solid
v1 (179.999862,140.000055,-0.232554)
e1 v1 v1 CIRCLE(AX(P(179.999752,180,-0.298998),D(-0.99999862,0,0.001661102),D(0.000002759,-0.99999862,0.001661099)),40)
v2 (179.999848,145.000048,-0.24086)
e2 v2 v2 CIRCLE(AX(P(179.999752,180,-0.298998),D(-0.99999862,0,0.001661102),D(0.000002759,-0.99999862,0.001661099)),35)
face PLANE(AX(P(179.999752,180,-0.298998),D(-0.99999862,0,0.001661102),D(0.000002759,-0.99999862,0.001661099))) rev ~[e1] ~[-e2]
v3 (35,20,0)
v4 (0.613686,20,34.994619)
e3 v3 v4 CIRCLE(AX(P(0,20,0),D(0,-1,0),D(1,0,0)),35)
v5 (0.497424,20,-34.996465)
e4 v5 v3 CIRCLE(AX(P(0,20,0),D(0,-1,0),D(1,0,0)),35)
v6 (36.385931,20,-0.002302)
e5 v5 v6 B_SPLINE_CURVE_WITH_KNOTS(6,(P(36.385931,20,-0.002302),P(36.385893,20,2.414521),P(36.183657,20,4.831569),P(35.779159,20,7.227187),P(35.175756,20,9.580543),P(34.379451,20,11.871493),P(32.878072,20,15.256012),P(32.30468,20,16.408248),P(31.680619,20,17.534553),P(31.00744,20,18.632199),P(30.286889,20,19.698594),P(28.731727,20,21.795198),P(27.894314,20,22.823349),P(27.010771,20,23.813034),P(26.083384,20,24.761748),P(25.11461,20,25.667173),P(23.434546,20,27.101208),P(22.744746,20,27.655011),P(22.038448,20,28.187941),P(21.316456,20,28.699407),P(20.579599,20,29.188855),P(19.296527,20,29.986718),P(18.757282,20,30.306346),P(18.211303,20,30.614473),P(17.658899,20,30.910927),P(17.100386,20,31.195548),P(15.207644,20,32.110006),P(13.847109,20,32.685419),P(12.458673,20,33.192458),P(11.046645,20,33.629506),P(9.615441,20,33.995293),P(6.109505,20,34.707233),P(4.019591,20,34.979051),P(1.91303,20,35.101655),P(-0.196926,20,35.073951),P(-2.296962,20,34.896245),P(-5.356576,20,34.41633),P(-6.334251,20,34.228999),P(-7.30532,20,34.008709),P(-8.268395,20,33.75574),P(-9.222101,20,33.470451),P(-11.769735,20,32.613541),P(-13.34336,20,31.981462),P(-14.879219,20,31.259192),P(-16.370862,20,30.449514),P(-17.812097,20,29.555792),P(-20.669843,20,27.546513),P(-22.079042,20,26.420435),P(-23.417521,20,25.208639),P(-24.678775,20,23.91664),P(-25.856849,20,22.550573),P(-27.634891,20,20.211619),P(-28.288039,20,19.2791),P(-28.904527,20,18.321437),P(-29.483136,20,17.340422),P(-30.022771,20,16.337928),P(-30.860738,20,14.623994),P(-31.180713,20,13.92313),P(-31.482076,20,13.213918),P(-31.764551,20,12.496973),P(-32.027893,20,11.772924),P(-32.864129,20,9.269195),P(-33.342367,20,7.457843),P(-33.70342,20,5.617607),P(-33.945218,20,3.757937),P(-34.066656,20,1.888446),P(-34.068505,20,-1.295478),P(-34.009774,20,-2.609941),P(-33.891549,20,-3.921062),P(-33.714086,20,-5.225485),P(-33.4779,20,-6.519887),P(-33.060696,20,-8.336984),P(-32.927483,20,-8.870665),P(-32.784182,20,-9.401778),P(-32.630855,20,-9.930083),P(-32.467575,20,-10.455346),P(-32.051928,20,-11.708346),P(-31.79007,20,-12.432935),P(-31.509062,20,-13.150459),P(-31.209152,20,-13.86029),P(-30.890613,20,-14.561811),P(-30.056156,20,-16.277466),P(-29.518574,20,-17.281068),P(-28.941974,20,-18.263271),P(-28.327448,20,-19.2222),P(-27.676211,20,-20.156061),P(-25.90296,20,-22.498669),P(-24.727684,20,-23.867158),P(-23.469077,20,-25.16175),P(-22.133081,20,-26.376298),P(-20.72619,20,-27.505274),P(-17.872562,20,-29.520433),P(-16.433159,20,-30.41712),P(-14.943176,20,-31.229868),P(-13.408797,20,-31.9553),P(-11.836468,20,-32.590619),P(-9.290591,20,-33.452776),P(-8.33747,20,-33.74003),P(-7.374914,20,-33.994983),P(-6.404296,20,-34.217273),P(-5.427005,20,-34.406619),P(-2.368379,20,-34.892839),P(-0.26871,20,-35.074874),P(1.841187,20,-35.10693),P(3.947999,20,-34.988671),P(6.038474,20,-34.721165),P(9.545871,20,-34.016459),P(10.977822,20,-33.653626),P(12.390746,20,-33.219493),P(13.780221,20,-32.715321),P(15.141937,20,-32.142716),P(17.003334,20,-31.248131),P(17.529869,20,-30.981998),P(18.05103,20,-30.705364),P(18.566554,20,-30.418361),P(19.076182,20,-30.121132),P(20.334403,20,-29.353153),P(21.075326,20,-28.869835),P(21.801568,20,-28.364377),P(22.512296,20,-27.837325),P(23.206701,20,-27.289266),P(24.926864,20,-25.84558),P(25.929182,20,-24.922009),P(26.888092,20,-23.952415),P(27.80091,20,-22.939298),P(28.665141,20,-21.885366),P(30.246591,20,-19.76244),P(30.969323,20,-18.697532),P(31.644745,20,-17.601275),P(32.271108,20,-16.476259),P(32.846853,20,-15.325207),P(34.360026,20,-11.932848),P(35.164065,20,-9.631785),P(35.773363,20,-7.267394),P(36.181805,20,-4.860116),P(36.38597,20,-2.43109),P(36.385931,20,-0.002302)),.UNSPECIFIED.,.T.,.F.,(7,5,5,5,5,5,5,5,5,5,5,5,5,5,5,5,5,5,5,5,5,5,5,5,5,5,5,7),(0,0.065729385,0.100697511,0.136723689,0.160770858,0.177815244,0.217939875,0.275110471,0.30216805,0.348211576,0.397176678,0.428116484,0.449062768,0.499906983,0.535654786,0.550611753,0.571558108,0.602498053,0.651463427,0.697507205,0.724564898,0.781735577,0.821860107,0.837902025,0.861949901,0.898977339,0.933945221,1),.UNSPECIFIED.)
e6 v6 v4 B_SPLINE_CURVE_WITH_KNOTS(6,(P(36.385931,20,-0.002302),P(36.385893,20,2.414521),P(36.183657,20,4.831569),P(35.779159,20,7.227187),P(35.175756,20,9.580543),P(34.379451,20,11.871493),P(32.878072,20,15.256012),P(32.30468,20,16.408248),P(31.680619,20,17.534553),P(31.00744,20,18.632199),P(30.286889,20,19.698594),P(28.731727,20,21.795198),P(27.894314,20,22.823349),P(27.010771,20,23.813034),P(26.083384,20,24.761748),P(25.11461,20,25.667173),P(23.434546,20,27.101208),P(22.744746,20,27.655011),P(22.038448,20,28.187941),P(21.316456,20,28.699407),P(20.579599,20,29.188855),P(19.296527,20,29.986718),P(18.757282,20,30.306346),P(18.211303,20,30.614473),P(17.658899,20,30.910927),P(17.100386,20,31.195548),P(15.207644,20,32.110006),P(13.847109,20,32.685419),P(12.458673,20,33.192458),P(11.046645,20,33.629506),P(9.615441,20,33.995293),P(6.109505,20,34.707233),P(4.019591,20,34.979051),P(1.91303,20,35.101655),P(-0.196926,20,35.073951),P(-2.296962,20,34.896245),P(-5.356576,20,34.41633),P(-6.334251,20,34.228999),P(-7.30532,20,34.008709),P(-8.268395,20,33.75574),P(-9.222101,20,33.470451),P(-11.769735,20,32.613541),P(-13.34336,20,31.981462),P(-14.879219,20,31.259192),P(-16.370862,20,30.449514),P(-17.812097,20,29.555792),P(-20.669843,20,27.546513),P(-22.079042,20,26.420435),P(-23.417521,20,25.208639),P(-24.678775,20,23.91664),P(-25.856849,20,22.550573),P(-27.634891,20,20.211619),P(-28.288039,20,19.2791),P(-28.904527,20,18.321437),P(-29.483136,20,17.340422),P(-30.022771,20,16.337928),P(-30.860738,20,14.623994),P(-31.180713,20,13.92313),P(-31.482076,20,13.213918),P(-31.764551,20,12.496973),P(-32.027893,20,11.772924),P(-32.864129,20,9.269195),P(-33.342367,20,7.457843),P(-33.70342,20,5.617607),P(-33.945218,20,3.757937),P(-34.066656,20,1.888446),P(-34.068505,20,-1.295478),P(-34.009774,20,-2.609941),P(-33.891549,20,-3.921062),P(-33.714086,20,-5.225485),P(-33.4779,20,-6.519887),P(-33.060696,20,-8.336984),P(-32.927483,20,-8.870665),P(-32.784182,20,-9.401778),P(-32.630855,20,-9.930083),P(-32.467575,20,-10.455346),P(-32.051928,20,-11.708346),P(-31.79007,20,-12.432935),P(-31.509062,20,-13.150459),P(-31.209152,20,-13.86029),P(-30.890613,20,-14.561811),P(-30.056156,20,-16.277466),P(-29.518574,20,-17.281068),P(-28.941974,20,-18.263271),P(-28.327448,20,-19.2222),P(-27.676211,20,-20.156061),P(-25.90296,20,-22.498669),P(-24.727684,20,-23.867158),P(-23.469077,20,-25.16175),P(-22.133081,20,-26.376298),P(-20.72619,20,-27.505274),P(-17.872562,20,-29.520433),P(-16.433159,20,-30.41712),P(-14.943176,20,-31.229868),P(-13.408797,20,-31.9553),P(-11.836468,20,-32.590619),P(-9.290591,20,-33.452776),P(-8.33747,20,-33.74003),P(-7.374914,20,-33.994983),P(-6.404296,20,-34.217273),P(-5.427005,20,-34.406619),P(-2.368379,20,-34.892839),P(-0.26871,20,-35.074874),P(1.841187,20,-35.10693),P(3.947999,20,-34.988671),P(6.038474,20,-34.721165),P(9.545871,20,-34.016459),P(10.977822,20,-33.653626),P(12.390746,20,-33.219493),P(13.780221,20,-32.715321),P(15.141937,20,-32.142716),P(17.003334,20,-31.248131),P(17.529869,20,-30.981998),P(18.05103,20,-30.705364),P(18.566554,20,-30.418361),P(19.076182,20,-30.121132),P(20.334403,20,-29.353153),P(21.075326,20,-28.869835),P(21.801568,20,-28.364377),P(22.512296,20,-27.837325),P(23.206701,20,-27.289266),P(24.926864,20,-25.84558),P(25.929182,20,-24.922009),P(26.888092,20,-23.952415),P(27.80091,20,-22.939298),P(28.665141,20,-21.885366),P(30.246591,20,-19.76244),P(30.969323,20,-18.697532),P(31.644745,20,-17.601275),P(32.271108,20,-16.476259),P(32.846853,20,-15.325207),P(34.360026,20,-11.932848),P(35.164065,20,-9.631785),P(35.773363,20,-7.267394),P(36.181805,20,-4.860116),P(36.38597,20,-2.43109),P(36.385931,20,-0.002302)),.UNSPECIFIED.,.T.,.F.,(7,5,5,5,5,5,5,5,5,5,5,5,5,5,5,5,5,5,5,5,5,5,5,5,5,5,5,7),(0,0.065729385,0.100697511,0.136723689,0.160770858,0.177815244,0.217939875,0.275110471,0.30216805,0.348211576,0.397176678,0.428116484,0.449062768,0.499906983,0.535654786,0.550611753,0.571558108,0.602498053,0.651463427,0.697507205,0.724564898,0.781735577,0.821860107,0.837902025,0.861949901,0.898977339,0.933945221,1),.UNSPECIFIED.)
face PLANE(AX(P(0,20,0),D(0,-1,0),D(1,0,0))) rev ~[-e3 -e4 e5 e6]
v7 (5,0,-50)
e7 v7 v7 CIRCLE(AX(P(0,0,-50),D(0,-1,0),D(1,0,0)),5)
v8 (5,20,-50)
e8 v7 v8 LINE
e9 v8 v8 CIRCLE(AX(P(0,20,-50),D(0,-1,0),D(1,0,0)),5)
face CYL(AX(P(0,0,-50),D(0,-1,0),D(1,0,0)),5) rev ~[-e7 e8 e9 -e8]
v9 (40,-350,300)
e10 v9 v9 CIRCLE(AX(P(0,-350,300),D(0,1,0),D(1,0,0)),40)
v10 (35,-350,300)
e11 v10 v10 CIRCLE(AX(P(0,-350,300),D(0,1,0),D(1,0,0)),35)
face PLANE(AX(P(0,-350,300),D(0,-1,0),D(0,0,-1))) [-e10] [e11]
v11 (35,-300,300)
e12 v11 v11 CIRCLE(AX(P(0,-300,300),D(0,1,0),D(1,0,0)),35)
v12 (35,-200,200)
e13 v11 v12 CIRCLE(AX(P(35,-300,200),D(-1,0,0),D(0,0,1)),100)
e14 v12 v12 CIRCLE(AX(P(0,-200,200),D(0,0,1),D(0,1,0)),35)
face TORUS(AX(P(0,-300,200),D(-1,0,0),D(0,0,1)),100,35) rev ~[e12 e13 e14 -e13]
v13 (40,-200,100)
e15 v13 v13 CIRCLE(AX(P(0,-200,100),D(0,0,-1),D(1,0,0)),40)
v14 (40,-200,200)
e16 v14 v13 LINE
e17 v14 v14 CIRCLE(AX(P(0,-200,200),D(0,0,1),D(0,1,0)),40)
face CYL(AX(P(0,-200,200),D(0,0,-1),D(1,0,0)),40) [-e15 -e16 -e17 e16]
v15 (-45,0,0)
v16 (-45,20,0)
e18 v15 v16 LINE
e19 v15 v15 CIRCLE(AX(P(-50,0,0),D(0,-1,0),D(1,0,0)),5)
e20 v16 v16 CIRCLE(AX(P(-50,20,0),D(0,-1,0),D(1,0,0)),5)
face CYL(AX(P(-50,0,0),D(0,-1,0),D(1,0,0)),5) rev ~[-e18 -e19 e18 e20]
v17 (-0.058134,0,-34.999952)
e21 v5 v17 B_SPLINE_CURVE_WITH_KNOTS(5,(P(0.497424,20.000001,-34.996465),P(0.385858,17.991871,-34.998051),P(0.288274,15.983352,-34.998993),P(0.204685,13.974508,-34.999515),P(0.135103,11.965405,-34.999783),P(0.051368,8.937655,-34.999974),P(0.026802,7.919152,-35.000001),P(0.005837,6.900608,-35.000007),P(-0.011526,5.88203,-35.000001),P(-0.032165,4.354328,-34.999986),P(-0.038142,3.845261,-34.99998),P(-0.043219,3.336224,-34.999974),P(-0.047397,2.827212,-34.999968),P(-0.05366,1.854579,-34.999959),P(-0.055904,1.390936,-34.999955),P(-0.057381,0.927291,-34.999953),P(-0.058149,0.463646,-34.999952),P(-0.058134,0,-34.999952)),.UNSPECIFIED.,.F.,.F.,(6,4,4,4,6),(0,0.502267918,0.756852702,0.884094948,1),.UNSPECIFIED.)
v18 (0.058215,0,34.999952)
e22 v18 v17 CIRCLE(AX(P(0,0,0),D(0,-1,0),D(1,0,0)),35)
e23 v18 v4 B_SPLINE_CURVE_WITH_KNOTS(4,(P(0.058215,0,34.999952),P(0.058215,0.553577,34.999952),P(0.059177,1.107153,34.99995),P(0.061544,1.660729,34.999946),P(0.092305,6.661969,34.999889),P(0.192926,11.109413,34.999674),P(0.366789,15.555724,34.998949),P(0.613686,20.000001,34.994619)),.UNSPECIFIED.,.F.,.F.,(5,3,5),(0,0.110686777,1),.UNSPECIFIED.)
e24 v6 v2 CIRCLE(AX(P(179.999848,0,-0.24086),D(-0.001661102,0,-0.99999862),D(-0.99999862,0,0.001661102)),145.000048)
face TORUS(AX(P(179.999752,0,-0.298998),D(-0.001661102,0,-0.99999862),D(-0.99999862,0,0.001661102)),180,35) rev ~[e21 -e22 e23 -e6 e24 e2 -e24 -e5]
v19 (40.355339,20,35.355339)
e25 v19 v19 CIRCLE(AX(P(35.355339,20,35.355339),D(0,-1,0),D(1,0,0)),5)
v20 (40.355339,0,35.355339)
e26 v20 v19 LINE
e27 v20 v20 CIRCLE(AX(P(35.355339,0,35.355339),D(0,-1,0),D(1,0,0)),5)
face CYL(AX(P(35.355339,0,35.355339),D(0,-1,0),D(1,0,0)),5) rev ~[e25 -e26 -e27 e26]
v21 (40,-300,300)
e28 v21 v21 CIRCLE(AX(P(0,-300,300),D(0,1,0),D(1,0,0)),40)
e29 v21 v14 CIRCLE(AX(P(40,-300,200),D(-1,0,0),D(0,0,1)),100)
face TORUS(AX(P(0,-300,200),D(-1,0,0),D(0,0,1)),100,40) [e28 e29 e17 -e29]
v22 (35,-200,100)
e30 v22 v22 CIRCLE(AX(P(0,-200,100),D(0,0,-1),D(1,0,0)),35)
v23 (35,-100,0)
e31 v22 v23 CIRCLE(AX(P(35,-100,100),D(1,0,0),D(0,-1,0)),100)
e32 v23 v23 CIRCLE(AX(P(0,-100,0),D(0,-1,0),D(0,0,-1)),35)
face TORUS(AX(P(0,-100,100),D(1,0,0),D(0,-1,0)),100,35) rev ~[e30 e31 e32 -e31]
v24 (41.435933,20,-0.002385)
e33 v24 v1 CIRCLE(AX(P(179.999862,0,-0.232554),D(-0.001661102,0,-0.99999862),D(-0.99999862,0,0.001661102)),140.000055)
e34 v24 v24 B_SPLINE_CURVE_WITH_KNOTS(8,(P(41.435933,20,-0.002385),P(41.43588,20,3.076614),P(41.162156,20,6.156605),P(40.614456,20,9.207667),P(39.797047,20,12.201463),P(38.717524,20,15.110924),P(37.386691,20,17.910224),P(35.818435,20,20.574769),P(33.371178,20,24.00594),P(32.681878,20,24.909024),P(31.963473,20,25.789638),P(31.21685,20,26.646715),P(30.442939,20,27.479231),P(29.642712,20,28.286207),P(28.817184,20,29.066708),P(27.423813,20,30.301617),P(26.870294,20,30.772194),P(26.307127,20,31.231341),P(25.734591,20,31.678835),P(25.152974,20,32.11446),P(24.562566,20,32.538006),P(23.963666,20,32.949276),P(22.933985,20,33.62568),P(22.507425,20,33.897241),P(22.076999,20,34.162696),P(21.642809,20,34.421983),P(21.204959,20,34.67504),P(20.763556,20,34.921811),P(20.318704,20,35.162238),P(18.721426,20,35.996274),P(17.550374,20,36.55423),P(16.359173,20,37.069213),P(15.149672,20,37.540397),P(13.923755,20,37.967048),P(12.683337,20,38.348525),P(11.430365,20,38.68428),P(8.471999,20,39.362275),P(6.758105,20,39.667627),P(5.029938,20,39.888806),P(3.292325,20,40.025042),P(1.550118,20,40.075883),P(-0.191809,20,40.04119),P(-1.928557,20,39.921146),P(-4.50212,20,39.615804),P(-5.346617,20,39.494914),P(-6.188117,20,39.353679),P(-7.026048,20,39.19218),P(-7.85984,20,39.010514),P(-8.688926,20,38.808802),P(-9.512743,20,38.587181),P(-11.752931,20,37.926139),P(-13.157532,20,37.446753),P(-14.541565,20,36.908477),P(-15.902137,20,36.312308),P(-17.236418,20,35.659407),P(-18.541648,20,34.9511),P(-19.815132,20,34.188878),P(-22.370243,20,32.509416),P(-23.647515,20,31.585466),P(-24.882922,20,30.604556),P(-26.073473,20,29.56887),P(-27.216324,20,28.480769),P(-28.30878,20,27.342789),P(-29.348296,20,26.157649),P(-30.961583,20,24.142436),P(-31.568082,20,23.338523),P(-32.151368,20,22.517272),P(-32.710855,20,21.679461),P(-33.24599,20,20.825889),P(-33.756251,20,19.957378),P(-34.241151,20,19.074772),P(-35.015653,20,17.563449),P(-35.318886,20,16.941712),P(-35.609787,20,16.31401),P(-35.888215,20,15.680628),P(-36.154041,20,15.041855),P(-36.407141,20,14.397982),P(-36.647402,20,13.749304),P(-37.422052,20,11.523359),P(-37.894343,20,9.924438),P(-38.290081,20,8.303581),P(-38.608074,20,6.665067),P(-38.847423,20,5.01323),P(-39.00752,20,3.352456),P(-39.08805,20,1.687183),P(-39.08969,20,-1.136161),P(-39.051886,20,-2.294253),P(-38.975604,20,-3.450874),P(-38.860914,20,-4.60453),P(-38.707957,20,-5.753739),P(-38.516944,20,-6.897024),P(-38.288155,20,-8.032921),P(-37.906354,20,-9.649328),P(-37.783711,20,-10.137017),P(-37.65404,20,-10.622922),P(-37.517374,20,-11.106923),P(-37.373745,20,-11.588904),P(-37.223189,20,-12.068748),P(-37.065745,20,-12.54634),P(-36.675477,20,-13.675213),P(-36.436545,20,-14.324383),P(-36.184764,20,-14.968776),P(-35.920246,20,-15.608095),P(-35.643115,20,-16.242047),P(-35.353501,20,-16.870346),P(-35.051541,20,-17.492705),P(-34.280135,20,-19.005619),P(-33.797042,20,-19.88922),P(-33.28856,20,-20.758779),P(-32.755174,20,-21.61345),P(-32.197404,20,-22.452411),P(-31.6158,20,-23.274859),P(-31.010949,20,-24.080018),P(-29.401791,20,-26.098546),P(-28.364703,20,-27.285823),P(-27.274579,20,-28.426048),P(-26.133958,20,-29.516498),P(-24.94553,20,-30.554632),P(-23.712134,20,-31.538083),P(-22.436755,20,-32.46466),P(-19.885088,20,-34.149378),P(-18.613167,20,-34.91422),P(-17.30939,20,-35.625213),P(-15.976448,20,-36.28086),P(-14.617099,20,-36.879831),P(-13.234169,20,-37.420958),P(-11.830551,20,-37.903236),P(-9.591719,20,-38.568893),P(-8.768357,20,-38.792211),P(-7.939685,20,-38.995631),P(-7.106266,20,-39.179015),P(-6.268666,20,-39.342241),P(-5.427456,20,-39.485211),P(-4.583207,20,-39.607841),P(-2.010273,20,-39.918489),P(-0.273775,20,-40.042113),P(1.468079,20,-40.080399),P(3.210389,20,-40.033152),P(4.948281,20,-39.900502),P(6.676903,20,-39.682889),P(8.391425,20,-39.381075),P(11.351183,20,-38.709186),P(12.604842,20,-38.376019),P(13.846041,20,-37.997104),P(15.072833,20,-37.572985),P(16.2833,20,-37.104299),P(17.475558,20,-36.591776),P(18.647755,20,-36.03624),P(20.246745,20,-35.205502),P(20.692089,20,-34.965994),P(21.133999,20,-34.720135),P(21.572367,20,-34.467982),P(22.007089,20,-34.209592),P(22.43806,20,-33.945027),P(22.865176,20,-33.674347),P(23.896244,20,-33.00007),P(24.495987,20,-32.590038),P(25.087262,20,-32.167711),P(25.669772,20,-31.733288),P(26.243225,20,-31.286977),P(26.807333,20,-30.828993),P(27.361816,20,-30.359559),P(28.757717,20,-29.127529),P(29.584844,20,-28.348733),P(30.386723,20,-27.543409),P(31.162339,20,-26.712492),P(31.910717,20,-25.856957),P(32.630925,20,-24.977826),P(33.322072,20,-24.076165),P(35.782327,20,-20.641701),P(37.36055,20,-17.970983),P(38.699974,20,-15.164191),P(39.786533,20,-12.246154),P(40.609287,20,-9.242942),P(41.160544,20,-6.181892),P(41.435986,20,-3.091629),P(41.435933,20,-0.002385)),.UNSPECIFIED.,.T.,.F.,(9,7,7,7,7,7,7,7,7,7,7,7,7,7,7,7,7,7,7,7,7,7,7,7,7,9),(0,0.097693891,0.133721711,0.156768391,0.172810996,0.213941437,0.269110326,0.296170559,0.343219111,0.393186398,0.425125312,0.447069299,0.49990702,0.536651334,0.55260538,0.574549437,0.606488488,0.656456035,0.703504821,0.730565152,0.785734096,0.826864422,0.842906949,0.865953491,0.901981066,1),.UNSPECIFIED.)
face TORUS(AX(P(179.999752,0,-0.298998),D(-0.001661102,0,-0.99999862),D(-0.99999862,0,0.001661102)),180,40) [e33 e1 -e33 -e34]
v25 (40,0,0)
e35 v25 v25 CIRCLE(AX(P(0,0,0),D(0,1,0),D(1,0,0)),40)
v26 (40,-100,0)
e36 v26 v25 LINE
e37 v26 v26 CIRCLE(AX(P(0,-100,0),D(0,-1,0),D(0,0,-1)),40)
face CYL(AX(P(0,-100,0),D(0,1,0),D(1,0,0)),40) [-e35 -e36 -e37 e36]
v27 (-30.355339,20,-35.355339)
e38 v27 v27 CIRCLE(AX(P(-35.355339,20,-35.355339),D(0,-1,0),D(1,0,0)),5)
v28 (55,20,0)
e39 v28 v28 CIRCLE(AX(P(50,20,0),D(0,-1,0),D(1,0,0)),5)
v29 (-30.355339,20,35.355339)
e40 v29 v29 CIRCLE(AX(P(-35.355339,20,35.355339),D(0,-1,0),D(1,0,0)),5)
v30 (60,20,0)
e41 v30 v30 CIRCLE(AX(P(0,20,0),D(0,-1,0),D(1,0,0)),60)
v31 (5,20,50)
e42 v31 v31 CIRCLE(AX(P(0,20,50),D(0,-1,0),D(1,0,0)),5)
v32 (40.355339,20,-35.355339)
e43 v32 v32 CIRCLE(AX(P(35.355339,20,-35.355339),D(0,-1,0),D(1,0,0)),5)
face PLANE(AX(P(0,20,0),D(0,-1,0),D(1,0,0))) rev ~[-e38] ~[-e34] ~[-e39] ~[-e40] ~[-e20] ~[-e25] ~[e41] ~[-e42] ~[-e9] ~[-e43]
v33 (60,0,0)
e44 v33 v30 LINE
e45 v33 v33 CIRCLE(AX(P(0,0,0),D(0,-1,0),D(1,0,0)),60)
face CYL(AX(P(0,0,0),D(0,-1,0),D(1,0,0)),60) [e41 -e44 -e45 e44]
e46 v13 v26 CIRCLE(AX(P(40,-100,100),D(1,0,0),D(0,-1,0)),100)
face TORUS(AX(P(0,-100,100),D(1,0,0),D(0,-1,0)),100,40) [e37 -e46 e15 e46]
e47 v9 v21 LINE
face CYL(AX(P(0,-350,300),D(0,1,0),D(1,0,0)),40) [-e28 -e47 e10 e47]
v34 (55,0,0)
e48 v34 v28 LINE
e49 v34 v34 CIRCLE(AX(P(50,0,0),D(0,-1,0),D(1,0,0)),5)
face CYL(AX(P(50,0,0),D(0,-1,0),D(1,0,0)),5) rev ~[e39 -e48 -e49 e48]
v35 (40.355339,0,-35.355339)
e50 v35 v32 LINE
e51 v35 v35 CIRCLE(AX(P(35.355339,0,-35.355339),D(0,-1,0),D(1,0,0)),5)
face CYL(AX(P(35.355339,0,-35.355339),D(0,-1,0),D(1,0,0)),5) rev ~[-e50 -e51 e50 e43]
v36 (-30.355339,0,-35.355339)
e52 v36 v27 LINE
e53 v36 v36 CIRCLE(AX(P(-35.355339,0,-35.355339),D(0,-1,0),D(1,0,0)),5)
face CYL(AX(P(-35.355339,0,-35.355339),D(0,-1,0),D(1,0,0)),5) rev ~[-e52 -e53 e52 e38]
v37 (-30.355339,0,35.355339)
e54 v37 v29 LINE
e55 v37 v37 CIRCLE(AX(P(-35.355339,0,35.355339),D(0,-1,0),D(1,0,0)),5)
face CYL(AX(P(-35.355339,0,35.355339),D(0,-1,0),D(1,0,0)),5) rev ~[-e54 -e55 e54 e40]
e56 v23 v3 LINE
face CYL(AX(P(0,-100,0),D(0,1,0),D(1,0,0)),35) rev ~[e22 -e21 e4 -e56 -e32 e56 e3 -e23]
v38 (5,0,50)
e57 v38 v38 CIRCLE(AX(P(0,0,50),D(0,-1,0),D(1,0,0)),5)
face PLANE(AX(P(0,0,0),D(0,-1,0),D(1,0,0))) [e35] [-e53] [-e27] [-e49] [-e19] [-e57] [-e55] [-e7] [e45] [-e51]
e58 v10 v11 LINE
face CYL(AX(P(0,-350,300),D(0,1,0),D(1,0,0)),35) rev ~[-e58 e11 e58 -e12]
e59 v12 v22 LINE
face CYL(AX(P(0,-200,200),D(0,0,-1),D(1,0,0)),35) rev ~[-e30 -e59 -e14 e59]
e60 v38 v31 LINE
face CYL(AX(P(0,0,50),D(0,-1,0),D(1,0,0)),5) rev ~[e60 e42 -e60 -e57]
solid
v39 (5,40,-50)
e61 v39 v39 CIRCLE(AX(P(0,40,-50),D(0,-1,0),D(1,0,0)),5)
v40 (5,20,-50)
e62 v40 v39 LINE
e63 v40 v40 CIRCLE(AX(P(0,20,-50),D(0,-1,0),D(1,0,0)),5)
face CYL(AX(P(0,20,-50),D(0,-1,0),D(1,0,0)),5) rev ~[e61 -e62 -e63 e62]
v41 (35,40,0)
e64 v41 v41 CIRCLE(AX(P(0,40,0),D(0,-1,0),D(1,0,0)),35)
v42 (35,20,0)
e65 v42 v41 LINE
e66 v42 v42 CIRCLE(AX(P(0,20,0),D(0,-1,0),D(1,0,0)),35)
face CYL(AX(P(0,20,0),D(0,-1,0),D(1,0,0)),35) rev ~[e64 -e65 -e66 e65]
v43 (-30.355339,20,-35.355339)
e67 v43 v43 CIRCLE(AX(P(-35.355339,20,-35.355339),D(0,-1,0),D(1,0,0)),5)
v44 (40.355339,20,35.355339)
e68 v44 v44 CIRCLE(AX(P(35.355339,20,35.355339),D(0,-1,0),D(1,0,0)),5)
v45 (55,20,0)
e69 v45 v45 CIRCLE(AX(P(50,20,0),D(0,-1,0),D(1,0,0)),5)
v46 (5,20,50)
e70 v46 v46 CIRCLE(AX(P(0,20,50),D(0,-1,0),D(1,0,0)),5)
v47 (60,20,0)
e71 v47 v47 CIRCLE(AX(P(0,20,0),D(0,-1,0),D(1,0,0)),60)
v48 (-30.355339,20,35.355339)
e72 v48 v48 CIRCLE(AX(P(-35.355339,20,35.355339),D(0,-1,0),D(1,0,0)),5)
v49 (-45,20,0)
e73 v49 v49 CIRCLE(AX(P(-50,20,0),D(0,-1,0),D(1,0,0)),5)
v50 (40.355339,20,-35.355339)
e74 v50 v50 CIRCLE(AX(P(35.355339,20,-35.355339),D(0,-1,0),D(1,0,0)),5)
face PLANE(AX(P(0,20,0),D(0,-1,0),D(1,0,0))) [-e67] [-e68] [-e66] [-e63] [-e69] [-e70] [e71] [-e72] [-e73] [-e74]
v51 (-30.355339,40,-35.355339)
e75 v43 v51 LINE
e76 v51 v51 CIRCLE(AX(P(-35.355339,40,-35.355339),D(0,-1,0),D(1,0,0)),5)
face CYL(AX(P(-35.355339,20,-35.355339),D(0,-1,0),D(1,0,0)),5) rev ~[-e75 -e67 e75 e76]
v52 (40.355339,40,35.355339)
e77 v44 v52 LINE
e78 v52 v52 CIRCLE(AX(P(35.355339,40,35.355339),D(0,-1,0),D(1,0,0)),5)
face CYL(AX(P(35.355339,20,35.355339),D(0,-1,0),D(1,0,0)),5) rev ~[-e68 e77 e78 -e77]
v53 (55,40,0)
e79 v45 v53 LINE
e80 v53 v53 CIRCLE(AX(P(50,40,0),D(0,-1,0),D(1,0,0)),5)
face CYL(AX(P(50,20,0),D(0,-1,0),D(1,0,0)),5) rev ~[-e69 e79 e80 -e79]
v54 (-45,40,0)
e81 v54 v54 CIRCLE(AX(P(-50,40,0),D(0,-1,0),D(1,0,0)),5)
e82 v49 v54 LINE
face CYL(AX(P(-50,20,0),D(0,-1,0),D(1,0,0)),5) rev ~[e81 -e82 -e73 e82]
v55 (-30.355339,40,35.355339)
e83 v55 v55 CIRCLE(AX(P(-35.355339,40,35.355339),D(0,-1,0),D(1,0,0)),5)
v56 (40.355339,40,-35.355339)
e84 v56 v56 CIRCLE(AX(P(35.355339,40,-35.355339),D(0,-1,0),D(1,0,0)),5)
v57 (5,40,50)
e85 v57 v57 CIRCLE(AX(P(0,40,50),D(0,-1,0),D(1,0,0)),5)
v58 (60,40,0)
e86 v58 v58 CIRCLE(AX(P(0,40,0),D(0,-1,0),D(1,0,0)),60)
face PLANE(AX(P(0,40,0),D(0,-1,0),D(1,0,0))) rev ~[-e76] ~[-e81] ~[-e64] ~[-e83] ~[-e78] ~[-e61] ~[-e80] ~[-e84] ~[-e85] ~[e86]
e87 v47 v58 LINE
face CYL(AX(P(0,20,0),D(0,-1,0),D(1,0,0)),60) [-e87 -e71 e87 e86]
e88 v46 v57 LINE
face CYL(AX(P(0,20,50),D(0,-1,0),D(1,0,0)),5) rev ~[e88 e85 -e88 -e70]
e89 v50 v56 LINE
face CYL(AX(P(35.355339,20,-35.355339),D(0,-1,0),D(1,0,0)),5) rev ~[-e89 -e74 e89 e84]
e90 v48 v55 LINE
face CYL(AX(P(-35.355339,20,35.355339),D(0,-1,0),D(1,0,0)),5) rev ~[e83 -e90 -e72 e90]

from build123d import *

# Parameters (mm, degrees)
F0_R     = 60
F0_R_2   = 5
F0_R_3   = 35
F1_DEPTH = 20
F2_R     = 40
F2_R_2   = 35
F5_DEPTH = 20
F6_R     = 40
F6_R_2   = 35
F7_ANGLE = 90


with BuildPart() as f1:
    # F0 (on Front) → F1 (new body)
    with BuildSketch(Plane.XZ):
        Circle(F0_R)
        with Locations((-35.3553390593, -35.3553390593)):
            Circle(F0_R_2, mode=Mode.SUBTRACT)
        with Locations((0, -50)):
            Circle(F0_R_2, mode=Mode.SUBTRACT)
        with Locations((35.3553390593, -35.3553390593)):
            Circle(F0_R_2, mode=Mode.SUBTRACT)
        with Locations((-50, 0)):
            Circle(F0_R_2, mode=Mode.SUBTRACT)
        with Locations((-35.3553390593, 35.3553390593)):
            Circle(F0_R_2, mode=Mode.SUBTRACT)
        Circle(F0_R_3, mode=Mode.SUBTRACT)
        with Locations((50, 0)):
            Circle(F0_R_2, mode=Mode.SUBTRACT)
        with Locations((0, 50)):
            Circle(F0_R_2, mode=Mode.SUBTRACT)
        with Locations((35.3553390593, 35.3553390593)):
            Circle(F0_R_2, mode=Mode.SUBTRACT)
    extrude(amount=-F1_DEPTH)

    # F4: sweep along a path in F3
    with BuildLine(Plane.YZ) as f4_path:
        Line((-350, 300), (-300, 300))
        ThreePointArc((-300, 300), (-229.2893218813, 270.7106781187), (-200, 200))
        Line((-200, 200), (-200, 100))
        ThreePointArc((-200, 100), (-170.7106781187, 29.2893218813), (-100, 0))
        Line((-100, 0), (0, 0))
    # F2 (on Front) → F4 (sweep)
    with BuildSketch(Plane.XZ):
        Circle(F2_R)
        Circle(F2_R_2, mode=Mode.SUBTRACT)
    sweep(path=f4_path.line)


with BuildPart() as f5:
    # F5 (new): a face of the model
    f5_faces = [f1.part.faces().sort_by_distance(p)[0] for p in [
        (-58.3029437252, 20, 0),
    ]]
    extrude(f5_faces, amount=F5_DEPTH)


with BuildPart() as f1_1:
    add(f1.part)

    # F6 (on Front) → F7 (revolve)
    with BuildSketch(Plane.XZ):
        Circle(F6_R)
        Circle(F6_R_2, mode=Mode.SUBTRACT)
    revolve(axis=Axis((179.9991770814, 0, -0.6449039267), (-0.0016611016, 0, -0.9999986204)), revolution_arc=F7_ANGLE)


solid = Compound([f5.part, f1_1.part])
